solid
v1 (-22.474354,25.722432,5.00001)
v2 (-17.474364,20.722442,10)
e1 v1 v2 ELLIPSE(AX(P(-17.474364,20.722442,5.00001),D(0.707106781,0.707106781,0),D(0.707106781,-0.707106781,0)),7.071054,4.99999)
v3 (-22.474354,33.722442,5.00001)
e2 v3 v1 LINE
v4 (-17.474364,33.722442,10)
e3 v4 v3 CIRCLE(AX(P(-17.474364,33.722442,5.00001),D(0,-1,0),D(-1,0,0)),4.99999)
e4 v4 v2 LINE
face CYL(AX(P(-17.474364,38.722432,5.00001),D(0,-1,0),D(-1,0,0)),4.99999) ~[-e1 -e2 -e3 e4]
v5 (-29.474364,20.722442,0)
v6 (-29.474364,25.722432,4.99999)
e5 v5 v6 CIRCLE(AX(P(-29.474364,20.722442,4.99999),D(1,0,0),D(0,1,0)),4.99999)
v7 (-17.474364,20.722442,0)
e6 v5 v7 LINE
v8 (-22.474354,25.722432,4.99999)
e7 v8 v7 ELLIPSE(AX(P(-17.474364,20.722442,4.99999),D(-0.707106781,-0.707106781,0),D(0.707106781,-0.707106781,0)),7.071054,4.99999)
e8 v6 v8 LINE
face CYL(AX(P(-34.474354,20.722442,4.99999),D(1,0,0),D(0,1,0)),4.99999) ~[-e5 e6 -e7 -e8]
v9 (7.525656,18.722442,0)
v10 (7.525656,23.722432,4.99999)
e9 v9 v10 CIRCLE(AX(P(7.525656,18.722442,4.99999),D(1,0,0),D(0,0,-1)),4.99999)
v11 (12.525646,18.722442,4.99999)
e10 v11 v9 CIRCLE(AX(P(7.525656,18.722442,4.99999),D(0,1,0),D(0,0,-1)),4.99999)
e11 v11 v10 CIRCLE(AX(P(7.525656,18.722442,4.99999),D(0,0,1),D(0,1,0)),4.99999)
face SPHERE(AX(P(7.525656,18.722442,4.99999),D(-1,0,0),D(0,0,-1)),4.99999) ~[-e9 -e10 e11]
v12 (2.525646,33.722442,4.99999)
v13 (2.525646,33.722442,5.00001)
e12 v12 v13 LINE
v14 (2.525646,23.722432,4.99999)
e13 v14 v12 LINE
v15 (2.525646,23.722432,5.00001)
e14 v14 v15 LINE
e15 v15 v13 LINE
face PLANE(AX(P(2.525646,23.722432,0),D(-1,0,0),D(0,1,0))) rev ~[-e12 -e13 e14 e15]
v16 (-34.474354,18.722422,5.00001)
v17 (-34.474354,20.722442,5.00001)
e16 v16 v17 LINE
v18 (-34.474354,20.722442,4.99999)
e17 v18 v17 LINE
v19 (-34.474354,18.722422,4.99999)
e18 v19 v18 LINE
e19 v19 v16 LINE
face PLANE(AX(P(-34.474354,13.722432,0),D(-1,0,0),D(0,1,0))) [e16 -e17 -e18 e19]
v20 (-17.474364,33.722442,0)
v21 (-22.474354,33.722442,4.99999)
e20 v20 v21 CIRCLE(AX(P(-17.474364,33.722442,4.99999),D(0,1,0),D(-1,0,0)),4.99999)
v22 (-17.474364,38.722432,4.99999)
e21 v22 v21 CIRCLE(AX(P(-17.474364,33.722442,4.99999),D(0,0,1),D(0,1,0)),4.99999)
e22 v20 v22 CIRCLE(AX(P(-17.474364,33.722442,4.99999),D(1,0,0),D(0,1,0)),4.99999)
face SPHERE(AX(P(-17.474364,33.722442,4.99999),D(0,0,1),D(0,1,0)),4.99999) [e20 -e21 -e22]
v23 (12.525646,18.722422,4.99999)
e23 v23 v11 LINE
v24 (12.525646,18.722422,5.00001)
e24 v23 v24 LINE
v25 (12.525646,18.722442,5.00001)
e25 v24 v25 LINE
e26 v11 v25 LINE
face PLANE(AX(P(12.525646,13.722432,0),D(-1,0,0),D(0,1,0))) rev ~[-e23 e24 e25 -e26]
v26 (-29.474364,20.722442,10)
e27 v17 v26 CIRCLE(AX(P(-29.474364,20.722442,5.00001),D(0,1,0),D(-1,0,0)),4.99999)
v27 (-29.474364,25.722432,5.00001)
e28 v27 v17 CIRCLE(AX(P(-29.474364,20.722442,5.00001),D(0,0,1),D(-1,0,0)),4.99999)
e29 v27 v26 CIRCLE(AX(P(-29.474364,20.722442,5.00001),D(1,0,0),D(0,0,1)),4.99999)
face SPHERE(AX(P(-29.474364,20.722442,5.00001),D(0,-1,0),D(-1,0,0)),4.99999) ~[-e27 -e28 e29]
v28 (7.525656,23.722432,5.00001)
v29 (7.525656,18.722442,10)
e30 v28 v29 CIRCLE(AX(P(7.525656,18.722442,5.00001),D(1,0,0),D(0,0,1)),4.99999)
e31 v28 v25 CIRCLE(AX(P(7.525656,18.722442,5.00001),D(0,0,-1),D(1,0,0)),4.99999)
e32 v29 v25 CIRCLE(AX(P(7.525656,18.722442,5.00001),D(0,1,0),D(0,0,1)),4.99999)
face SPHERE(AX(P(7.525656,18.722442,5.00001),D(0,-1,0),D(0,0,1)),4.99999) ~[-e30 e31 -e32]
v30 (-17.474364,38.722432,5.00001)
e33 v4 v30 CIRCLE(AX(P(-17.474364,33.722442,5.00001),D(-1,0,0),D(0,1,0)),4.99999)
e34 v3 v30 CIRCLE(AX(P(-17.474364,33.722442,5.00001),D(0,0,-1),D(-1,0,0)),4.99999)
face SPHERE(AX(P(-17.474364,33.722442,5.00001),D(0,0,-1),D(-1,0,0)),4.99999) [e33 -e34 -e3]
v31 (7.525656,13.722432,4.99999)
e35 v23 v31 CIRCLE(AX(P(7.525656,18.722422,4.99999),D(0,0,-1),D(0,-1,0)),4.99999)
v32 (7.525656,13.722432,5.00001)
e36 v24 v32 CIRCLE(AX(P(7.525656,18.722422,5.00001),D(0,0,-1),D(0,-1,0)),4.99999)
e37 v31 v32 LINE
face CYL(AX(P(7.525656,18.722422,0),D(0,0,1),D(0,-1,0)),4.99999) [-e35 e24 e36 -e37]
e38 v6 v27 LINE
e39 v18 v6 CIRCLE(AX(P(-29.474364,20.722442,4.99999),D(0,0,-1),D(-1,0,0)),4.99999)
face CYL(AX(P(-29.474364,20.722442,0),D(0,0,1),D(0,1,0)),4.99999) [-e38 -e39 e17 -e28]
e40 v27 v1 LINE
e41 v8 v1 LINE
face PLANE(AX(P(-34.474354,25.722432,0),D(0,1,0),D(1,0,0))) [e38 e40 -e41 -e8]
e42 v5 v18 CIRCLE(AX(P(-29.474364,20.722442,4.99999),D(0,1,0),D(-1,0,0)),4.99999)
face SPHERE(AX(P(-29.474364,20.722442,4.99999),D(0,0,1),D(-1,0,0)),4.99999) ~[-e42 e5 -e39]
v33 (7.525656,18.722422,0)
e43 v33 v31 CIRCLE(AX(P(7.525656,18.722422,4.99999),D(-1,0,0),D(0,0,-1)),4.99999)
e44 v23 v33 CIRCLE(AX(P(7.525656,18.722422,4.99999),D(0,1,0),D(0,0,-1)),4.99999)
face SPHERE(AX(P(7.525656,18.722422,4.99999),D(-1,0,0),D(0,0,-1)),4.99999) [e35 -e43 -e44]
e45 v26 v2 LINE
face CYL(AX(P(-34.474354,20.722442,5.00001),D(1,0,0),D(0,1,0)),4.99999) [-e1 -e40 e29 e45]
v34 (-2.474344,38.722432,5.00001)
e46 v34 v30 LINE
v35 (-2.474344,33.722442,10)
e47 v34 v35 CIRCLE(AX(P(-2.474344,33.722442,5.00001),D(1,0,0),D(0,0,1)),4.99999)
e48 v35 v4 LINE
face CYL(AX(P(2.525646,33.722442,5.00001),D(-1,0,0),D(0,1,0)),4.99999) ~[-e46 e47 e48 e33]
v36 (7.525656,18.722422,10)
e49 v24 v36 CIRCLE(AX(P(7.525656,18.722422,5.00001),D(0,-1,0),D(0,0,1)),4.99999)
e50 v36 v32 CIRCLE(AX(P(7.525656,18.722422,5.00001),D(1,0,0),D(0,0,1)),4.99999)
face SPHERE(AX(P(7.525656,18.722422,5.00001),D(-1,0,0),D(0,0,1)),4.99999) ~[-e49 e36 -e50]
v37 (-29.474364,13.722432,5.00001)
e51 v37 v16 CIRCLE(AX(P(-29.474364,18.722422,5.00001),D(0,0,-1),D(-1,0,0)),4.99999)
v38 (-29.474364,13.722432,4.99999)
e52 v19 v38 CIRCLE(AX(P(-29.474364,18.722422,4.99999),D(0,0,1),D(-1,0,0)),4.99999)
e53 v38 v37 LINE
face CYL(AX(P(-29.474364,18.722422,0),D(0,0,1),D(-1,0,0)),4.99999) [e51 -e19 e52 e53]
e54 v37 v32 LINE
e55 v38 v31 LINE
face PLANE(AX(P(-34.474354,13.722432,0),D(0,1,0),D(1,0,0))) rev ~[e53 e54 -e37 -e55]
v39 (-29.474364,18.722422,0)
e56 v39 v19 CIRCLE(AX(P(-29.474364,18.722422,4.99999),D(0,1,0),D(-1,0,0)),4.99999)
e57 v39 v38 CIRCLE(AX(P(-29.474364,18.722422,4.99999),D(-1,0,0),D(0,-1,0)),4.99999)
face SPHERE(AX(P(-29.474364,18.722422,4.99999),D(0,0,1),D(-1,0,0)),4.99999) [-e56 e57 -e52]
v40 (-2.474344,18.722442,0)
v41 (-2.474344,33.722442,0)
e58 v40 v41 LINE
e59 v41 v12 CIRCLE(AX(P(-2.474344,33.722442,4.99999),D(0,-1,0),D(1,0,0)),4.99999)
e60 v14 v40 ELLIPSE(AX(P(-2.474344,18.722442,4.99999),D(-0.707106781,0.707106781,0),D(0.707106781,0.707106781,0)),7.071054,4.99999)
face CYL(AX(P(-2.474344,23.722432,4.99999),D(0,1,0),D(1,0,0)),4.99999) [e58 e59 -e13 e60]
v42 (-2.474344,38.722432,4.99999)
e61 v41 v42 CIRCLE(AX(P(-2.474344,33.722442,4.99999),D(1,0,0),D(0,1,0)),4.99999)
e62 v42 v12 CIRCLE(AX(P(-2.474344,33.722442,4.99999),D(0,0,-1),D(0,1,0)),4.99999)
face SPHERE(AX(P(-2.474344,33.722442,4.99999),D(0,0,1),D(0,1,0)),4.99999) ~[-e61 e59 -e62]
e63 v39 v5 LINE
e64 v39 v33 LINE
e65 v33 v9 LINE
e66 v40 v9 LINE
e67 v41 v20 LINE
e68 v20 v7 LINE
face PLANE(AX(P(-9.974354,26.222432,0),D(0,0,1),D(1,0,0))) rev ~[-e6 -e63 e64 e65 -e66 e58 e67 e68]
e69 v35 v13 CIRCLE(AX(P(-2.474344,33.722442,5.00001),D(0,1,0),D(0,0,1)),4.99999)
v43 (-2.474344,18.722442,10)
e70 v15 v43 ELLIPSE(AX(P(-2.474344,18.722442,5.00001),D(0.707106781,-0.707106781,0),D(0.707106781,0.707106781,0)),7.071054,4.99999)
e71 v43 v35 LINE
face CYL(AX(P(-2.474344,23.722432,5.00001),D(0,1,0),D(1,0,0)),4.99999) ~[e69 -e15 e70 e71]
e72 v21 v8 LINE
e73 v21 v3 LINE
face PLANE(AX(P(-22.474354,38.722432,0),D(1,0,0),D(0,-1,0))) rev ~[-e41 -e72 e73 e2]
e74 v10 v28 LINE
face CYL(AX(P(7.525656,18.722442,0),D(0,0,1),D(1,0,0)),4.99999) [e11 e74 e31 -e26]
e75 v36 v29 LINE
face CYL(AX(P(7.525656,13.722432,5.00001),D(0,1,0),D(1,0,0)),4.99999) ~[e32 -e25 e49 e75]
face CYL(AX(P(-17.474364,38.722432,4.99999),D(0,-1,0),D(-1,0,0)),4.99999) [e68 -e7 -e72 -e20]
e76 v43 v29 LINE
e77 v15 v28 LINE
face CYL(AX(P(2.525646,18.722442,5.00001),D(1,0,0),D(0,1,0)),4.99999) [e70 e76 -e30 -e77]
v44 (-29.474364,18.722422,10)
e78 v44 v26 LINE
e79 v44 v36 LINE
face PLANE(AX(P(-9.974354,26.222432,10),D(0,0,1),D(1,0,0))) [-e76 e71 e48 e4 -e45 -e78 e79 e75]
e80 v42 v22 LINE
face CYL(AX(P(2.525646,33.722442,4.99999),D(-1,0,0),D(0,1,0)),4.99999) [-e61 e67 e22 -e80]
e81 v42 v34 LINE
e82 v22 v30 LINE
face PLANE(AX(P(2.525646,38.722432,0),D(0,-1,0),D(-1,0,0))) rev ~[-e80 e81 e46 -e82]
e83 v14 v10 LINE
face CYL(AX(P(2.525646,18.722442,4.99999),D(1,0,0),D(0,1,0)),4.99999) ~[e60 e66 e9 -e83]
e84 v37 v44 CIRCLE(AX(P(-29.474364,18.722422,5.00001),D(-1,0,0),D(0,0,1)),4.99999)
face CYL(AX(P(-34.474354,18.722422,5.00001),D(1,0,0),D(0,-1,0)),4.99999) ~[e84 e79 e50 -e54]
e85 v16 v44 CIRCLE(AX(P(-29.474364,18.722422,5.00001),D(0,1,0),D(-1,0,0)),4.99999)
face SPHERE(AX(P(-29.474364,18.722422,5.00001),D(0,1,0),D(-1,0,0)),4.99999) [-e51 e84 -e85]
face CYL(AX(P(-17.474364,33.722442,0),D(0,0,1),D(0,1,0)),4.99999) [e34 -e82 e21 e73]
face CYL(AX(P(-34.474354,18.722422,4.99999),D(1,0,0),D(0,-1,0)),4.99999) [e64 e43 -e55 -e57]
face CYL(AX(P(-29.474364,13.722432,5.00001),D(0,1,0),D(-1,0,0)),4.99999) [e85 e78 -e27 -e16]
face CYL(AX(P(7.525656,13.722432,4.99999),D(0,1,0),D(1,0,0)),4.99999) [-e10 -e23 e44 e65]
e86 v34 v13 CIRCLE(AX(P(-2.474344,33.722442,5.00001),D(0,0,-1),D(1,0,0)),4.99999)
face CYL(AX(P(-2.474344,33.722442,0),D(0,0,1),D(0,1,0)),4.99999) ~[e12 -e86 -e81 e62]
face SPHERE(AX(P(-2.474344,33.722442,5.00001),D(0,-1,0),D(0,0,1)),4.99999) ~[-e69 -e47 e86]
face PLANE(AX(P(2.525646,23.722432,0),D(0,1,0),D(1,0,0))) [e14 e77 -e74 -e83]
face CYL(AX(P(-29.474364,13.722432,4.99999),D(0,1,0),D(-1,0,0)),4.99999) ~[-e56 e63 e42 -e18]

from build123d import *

# Parameters (mm, degrees)
F0_W     = 12
F0_H     = 12
F0_W_2   = 10
F0_H_2   = 10
F1_DEPTH = 10
F2_R     = 4.99999


# Not quite as in the source:
# - a fillet or chamfer is up to 0.001 mm smaller than in the source, because OpenCascade refuses the exact size


with BuildPart() as f1:
    # F0 (on Top) → F1 (new body)
    with BuildSketch(Plane.XY):
        Polygon((2.5256457627, 38.7224316552), (-22.4743542373, 38.7224316552), (-22.4743542373, 25.7224316552), (-22.4743542373, 13.7224316552), (2.5256457627, 13.7224316552), (2.5256457627, 23.7224316552), align=None)
        with Locations((-28.4743542373, 19.7224316552)):
            Rectangle(F0_W, F0_H)
        with Locations((7.5256457627, 18.7224316552)):
            Rectangle(F0_W_2, F0_H_2)
    extrude(amount=F1_DEPTH)

    # F2 (radius 5 in the source; OpenCascade refuses exactly that, so slightly less here)
    f2_edges = [f1.edges().sort_by_distance(p)[0] for p in [
        (-22.474354, 38.722432, 5),
        (-22.474354, 32.222432, 10),
        (-34.474354, 19.722432, 10),
        (-34.474354, 25.722432, 5),
        (-34.474354, 13.722432, 5),
        (-34.474354, 19.722432, 0),
        (2.525646, 31.222432, 10),
        (-9.974354, 38.722432, 10),
        (-28.474354, 25.722432, 10),
        (-10.974354, 13.722432, 10),
        (12.525646, 18.722432, 10),
        (7.525646, 23.722432, 10),
        (2.525646, 38.722432, 5),
        (-9.974354, 38.722432, 0),
        (7.525646, 23.722432, 0),
        (2.525646, 31.222432, 0),
        (-22.474354, 32.222432, 0),
        (-28.474354, 25.722432, 0),
        (-10.974354, 13.722432, 0),
        (12.525646, 18.722432, 0),
        (12.525646, 13.722432, 5),
        (12.525646, 23.722432, 5),
    ]]
    fillet(f2_edges, radius=F2_R)


solid = f1.part
